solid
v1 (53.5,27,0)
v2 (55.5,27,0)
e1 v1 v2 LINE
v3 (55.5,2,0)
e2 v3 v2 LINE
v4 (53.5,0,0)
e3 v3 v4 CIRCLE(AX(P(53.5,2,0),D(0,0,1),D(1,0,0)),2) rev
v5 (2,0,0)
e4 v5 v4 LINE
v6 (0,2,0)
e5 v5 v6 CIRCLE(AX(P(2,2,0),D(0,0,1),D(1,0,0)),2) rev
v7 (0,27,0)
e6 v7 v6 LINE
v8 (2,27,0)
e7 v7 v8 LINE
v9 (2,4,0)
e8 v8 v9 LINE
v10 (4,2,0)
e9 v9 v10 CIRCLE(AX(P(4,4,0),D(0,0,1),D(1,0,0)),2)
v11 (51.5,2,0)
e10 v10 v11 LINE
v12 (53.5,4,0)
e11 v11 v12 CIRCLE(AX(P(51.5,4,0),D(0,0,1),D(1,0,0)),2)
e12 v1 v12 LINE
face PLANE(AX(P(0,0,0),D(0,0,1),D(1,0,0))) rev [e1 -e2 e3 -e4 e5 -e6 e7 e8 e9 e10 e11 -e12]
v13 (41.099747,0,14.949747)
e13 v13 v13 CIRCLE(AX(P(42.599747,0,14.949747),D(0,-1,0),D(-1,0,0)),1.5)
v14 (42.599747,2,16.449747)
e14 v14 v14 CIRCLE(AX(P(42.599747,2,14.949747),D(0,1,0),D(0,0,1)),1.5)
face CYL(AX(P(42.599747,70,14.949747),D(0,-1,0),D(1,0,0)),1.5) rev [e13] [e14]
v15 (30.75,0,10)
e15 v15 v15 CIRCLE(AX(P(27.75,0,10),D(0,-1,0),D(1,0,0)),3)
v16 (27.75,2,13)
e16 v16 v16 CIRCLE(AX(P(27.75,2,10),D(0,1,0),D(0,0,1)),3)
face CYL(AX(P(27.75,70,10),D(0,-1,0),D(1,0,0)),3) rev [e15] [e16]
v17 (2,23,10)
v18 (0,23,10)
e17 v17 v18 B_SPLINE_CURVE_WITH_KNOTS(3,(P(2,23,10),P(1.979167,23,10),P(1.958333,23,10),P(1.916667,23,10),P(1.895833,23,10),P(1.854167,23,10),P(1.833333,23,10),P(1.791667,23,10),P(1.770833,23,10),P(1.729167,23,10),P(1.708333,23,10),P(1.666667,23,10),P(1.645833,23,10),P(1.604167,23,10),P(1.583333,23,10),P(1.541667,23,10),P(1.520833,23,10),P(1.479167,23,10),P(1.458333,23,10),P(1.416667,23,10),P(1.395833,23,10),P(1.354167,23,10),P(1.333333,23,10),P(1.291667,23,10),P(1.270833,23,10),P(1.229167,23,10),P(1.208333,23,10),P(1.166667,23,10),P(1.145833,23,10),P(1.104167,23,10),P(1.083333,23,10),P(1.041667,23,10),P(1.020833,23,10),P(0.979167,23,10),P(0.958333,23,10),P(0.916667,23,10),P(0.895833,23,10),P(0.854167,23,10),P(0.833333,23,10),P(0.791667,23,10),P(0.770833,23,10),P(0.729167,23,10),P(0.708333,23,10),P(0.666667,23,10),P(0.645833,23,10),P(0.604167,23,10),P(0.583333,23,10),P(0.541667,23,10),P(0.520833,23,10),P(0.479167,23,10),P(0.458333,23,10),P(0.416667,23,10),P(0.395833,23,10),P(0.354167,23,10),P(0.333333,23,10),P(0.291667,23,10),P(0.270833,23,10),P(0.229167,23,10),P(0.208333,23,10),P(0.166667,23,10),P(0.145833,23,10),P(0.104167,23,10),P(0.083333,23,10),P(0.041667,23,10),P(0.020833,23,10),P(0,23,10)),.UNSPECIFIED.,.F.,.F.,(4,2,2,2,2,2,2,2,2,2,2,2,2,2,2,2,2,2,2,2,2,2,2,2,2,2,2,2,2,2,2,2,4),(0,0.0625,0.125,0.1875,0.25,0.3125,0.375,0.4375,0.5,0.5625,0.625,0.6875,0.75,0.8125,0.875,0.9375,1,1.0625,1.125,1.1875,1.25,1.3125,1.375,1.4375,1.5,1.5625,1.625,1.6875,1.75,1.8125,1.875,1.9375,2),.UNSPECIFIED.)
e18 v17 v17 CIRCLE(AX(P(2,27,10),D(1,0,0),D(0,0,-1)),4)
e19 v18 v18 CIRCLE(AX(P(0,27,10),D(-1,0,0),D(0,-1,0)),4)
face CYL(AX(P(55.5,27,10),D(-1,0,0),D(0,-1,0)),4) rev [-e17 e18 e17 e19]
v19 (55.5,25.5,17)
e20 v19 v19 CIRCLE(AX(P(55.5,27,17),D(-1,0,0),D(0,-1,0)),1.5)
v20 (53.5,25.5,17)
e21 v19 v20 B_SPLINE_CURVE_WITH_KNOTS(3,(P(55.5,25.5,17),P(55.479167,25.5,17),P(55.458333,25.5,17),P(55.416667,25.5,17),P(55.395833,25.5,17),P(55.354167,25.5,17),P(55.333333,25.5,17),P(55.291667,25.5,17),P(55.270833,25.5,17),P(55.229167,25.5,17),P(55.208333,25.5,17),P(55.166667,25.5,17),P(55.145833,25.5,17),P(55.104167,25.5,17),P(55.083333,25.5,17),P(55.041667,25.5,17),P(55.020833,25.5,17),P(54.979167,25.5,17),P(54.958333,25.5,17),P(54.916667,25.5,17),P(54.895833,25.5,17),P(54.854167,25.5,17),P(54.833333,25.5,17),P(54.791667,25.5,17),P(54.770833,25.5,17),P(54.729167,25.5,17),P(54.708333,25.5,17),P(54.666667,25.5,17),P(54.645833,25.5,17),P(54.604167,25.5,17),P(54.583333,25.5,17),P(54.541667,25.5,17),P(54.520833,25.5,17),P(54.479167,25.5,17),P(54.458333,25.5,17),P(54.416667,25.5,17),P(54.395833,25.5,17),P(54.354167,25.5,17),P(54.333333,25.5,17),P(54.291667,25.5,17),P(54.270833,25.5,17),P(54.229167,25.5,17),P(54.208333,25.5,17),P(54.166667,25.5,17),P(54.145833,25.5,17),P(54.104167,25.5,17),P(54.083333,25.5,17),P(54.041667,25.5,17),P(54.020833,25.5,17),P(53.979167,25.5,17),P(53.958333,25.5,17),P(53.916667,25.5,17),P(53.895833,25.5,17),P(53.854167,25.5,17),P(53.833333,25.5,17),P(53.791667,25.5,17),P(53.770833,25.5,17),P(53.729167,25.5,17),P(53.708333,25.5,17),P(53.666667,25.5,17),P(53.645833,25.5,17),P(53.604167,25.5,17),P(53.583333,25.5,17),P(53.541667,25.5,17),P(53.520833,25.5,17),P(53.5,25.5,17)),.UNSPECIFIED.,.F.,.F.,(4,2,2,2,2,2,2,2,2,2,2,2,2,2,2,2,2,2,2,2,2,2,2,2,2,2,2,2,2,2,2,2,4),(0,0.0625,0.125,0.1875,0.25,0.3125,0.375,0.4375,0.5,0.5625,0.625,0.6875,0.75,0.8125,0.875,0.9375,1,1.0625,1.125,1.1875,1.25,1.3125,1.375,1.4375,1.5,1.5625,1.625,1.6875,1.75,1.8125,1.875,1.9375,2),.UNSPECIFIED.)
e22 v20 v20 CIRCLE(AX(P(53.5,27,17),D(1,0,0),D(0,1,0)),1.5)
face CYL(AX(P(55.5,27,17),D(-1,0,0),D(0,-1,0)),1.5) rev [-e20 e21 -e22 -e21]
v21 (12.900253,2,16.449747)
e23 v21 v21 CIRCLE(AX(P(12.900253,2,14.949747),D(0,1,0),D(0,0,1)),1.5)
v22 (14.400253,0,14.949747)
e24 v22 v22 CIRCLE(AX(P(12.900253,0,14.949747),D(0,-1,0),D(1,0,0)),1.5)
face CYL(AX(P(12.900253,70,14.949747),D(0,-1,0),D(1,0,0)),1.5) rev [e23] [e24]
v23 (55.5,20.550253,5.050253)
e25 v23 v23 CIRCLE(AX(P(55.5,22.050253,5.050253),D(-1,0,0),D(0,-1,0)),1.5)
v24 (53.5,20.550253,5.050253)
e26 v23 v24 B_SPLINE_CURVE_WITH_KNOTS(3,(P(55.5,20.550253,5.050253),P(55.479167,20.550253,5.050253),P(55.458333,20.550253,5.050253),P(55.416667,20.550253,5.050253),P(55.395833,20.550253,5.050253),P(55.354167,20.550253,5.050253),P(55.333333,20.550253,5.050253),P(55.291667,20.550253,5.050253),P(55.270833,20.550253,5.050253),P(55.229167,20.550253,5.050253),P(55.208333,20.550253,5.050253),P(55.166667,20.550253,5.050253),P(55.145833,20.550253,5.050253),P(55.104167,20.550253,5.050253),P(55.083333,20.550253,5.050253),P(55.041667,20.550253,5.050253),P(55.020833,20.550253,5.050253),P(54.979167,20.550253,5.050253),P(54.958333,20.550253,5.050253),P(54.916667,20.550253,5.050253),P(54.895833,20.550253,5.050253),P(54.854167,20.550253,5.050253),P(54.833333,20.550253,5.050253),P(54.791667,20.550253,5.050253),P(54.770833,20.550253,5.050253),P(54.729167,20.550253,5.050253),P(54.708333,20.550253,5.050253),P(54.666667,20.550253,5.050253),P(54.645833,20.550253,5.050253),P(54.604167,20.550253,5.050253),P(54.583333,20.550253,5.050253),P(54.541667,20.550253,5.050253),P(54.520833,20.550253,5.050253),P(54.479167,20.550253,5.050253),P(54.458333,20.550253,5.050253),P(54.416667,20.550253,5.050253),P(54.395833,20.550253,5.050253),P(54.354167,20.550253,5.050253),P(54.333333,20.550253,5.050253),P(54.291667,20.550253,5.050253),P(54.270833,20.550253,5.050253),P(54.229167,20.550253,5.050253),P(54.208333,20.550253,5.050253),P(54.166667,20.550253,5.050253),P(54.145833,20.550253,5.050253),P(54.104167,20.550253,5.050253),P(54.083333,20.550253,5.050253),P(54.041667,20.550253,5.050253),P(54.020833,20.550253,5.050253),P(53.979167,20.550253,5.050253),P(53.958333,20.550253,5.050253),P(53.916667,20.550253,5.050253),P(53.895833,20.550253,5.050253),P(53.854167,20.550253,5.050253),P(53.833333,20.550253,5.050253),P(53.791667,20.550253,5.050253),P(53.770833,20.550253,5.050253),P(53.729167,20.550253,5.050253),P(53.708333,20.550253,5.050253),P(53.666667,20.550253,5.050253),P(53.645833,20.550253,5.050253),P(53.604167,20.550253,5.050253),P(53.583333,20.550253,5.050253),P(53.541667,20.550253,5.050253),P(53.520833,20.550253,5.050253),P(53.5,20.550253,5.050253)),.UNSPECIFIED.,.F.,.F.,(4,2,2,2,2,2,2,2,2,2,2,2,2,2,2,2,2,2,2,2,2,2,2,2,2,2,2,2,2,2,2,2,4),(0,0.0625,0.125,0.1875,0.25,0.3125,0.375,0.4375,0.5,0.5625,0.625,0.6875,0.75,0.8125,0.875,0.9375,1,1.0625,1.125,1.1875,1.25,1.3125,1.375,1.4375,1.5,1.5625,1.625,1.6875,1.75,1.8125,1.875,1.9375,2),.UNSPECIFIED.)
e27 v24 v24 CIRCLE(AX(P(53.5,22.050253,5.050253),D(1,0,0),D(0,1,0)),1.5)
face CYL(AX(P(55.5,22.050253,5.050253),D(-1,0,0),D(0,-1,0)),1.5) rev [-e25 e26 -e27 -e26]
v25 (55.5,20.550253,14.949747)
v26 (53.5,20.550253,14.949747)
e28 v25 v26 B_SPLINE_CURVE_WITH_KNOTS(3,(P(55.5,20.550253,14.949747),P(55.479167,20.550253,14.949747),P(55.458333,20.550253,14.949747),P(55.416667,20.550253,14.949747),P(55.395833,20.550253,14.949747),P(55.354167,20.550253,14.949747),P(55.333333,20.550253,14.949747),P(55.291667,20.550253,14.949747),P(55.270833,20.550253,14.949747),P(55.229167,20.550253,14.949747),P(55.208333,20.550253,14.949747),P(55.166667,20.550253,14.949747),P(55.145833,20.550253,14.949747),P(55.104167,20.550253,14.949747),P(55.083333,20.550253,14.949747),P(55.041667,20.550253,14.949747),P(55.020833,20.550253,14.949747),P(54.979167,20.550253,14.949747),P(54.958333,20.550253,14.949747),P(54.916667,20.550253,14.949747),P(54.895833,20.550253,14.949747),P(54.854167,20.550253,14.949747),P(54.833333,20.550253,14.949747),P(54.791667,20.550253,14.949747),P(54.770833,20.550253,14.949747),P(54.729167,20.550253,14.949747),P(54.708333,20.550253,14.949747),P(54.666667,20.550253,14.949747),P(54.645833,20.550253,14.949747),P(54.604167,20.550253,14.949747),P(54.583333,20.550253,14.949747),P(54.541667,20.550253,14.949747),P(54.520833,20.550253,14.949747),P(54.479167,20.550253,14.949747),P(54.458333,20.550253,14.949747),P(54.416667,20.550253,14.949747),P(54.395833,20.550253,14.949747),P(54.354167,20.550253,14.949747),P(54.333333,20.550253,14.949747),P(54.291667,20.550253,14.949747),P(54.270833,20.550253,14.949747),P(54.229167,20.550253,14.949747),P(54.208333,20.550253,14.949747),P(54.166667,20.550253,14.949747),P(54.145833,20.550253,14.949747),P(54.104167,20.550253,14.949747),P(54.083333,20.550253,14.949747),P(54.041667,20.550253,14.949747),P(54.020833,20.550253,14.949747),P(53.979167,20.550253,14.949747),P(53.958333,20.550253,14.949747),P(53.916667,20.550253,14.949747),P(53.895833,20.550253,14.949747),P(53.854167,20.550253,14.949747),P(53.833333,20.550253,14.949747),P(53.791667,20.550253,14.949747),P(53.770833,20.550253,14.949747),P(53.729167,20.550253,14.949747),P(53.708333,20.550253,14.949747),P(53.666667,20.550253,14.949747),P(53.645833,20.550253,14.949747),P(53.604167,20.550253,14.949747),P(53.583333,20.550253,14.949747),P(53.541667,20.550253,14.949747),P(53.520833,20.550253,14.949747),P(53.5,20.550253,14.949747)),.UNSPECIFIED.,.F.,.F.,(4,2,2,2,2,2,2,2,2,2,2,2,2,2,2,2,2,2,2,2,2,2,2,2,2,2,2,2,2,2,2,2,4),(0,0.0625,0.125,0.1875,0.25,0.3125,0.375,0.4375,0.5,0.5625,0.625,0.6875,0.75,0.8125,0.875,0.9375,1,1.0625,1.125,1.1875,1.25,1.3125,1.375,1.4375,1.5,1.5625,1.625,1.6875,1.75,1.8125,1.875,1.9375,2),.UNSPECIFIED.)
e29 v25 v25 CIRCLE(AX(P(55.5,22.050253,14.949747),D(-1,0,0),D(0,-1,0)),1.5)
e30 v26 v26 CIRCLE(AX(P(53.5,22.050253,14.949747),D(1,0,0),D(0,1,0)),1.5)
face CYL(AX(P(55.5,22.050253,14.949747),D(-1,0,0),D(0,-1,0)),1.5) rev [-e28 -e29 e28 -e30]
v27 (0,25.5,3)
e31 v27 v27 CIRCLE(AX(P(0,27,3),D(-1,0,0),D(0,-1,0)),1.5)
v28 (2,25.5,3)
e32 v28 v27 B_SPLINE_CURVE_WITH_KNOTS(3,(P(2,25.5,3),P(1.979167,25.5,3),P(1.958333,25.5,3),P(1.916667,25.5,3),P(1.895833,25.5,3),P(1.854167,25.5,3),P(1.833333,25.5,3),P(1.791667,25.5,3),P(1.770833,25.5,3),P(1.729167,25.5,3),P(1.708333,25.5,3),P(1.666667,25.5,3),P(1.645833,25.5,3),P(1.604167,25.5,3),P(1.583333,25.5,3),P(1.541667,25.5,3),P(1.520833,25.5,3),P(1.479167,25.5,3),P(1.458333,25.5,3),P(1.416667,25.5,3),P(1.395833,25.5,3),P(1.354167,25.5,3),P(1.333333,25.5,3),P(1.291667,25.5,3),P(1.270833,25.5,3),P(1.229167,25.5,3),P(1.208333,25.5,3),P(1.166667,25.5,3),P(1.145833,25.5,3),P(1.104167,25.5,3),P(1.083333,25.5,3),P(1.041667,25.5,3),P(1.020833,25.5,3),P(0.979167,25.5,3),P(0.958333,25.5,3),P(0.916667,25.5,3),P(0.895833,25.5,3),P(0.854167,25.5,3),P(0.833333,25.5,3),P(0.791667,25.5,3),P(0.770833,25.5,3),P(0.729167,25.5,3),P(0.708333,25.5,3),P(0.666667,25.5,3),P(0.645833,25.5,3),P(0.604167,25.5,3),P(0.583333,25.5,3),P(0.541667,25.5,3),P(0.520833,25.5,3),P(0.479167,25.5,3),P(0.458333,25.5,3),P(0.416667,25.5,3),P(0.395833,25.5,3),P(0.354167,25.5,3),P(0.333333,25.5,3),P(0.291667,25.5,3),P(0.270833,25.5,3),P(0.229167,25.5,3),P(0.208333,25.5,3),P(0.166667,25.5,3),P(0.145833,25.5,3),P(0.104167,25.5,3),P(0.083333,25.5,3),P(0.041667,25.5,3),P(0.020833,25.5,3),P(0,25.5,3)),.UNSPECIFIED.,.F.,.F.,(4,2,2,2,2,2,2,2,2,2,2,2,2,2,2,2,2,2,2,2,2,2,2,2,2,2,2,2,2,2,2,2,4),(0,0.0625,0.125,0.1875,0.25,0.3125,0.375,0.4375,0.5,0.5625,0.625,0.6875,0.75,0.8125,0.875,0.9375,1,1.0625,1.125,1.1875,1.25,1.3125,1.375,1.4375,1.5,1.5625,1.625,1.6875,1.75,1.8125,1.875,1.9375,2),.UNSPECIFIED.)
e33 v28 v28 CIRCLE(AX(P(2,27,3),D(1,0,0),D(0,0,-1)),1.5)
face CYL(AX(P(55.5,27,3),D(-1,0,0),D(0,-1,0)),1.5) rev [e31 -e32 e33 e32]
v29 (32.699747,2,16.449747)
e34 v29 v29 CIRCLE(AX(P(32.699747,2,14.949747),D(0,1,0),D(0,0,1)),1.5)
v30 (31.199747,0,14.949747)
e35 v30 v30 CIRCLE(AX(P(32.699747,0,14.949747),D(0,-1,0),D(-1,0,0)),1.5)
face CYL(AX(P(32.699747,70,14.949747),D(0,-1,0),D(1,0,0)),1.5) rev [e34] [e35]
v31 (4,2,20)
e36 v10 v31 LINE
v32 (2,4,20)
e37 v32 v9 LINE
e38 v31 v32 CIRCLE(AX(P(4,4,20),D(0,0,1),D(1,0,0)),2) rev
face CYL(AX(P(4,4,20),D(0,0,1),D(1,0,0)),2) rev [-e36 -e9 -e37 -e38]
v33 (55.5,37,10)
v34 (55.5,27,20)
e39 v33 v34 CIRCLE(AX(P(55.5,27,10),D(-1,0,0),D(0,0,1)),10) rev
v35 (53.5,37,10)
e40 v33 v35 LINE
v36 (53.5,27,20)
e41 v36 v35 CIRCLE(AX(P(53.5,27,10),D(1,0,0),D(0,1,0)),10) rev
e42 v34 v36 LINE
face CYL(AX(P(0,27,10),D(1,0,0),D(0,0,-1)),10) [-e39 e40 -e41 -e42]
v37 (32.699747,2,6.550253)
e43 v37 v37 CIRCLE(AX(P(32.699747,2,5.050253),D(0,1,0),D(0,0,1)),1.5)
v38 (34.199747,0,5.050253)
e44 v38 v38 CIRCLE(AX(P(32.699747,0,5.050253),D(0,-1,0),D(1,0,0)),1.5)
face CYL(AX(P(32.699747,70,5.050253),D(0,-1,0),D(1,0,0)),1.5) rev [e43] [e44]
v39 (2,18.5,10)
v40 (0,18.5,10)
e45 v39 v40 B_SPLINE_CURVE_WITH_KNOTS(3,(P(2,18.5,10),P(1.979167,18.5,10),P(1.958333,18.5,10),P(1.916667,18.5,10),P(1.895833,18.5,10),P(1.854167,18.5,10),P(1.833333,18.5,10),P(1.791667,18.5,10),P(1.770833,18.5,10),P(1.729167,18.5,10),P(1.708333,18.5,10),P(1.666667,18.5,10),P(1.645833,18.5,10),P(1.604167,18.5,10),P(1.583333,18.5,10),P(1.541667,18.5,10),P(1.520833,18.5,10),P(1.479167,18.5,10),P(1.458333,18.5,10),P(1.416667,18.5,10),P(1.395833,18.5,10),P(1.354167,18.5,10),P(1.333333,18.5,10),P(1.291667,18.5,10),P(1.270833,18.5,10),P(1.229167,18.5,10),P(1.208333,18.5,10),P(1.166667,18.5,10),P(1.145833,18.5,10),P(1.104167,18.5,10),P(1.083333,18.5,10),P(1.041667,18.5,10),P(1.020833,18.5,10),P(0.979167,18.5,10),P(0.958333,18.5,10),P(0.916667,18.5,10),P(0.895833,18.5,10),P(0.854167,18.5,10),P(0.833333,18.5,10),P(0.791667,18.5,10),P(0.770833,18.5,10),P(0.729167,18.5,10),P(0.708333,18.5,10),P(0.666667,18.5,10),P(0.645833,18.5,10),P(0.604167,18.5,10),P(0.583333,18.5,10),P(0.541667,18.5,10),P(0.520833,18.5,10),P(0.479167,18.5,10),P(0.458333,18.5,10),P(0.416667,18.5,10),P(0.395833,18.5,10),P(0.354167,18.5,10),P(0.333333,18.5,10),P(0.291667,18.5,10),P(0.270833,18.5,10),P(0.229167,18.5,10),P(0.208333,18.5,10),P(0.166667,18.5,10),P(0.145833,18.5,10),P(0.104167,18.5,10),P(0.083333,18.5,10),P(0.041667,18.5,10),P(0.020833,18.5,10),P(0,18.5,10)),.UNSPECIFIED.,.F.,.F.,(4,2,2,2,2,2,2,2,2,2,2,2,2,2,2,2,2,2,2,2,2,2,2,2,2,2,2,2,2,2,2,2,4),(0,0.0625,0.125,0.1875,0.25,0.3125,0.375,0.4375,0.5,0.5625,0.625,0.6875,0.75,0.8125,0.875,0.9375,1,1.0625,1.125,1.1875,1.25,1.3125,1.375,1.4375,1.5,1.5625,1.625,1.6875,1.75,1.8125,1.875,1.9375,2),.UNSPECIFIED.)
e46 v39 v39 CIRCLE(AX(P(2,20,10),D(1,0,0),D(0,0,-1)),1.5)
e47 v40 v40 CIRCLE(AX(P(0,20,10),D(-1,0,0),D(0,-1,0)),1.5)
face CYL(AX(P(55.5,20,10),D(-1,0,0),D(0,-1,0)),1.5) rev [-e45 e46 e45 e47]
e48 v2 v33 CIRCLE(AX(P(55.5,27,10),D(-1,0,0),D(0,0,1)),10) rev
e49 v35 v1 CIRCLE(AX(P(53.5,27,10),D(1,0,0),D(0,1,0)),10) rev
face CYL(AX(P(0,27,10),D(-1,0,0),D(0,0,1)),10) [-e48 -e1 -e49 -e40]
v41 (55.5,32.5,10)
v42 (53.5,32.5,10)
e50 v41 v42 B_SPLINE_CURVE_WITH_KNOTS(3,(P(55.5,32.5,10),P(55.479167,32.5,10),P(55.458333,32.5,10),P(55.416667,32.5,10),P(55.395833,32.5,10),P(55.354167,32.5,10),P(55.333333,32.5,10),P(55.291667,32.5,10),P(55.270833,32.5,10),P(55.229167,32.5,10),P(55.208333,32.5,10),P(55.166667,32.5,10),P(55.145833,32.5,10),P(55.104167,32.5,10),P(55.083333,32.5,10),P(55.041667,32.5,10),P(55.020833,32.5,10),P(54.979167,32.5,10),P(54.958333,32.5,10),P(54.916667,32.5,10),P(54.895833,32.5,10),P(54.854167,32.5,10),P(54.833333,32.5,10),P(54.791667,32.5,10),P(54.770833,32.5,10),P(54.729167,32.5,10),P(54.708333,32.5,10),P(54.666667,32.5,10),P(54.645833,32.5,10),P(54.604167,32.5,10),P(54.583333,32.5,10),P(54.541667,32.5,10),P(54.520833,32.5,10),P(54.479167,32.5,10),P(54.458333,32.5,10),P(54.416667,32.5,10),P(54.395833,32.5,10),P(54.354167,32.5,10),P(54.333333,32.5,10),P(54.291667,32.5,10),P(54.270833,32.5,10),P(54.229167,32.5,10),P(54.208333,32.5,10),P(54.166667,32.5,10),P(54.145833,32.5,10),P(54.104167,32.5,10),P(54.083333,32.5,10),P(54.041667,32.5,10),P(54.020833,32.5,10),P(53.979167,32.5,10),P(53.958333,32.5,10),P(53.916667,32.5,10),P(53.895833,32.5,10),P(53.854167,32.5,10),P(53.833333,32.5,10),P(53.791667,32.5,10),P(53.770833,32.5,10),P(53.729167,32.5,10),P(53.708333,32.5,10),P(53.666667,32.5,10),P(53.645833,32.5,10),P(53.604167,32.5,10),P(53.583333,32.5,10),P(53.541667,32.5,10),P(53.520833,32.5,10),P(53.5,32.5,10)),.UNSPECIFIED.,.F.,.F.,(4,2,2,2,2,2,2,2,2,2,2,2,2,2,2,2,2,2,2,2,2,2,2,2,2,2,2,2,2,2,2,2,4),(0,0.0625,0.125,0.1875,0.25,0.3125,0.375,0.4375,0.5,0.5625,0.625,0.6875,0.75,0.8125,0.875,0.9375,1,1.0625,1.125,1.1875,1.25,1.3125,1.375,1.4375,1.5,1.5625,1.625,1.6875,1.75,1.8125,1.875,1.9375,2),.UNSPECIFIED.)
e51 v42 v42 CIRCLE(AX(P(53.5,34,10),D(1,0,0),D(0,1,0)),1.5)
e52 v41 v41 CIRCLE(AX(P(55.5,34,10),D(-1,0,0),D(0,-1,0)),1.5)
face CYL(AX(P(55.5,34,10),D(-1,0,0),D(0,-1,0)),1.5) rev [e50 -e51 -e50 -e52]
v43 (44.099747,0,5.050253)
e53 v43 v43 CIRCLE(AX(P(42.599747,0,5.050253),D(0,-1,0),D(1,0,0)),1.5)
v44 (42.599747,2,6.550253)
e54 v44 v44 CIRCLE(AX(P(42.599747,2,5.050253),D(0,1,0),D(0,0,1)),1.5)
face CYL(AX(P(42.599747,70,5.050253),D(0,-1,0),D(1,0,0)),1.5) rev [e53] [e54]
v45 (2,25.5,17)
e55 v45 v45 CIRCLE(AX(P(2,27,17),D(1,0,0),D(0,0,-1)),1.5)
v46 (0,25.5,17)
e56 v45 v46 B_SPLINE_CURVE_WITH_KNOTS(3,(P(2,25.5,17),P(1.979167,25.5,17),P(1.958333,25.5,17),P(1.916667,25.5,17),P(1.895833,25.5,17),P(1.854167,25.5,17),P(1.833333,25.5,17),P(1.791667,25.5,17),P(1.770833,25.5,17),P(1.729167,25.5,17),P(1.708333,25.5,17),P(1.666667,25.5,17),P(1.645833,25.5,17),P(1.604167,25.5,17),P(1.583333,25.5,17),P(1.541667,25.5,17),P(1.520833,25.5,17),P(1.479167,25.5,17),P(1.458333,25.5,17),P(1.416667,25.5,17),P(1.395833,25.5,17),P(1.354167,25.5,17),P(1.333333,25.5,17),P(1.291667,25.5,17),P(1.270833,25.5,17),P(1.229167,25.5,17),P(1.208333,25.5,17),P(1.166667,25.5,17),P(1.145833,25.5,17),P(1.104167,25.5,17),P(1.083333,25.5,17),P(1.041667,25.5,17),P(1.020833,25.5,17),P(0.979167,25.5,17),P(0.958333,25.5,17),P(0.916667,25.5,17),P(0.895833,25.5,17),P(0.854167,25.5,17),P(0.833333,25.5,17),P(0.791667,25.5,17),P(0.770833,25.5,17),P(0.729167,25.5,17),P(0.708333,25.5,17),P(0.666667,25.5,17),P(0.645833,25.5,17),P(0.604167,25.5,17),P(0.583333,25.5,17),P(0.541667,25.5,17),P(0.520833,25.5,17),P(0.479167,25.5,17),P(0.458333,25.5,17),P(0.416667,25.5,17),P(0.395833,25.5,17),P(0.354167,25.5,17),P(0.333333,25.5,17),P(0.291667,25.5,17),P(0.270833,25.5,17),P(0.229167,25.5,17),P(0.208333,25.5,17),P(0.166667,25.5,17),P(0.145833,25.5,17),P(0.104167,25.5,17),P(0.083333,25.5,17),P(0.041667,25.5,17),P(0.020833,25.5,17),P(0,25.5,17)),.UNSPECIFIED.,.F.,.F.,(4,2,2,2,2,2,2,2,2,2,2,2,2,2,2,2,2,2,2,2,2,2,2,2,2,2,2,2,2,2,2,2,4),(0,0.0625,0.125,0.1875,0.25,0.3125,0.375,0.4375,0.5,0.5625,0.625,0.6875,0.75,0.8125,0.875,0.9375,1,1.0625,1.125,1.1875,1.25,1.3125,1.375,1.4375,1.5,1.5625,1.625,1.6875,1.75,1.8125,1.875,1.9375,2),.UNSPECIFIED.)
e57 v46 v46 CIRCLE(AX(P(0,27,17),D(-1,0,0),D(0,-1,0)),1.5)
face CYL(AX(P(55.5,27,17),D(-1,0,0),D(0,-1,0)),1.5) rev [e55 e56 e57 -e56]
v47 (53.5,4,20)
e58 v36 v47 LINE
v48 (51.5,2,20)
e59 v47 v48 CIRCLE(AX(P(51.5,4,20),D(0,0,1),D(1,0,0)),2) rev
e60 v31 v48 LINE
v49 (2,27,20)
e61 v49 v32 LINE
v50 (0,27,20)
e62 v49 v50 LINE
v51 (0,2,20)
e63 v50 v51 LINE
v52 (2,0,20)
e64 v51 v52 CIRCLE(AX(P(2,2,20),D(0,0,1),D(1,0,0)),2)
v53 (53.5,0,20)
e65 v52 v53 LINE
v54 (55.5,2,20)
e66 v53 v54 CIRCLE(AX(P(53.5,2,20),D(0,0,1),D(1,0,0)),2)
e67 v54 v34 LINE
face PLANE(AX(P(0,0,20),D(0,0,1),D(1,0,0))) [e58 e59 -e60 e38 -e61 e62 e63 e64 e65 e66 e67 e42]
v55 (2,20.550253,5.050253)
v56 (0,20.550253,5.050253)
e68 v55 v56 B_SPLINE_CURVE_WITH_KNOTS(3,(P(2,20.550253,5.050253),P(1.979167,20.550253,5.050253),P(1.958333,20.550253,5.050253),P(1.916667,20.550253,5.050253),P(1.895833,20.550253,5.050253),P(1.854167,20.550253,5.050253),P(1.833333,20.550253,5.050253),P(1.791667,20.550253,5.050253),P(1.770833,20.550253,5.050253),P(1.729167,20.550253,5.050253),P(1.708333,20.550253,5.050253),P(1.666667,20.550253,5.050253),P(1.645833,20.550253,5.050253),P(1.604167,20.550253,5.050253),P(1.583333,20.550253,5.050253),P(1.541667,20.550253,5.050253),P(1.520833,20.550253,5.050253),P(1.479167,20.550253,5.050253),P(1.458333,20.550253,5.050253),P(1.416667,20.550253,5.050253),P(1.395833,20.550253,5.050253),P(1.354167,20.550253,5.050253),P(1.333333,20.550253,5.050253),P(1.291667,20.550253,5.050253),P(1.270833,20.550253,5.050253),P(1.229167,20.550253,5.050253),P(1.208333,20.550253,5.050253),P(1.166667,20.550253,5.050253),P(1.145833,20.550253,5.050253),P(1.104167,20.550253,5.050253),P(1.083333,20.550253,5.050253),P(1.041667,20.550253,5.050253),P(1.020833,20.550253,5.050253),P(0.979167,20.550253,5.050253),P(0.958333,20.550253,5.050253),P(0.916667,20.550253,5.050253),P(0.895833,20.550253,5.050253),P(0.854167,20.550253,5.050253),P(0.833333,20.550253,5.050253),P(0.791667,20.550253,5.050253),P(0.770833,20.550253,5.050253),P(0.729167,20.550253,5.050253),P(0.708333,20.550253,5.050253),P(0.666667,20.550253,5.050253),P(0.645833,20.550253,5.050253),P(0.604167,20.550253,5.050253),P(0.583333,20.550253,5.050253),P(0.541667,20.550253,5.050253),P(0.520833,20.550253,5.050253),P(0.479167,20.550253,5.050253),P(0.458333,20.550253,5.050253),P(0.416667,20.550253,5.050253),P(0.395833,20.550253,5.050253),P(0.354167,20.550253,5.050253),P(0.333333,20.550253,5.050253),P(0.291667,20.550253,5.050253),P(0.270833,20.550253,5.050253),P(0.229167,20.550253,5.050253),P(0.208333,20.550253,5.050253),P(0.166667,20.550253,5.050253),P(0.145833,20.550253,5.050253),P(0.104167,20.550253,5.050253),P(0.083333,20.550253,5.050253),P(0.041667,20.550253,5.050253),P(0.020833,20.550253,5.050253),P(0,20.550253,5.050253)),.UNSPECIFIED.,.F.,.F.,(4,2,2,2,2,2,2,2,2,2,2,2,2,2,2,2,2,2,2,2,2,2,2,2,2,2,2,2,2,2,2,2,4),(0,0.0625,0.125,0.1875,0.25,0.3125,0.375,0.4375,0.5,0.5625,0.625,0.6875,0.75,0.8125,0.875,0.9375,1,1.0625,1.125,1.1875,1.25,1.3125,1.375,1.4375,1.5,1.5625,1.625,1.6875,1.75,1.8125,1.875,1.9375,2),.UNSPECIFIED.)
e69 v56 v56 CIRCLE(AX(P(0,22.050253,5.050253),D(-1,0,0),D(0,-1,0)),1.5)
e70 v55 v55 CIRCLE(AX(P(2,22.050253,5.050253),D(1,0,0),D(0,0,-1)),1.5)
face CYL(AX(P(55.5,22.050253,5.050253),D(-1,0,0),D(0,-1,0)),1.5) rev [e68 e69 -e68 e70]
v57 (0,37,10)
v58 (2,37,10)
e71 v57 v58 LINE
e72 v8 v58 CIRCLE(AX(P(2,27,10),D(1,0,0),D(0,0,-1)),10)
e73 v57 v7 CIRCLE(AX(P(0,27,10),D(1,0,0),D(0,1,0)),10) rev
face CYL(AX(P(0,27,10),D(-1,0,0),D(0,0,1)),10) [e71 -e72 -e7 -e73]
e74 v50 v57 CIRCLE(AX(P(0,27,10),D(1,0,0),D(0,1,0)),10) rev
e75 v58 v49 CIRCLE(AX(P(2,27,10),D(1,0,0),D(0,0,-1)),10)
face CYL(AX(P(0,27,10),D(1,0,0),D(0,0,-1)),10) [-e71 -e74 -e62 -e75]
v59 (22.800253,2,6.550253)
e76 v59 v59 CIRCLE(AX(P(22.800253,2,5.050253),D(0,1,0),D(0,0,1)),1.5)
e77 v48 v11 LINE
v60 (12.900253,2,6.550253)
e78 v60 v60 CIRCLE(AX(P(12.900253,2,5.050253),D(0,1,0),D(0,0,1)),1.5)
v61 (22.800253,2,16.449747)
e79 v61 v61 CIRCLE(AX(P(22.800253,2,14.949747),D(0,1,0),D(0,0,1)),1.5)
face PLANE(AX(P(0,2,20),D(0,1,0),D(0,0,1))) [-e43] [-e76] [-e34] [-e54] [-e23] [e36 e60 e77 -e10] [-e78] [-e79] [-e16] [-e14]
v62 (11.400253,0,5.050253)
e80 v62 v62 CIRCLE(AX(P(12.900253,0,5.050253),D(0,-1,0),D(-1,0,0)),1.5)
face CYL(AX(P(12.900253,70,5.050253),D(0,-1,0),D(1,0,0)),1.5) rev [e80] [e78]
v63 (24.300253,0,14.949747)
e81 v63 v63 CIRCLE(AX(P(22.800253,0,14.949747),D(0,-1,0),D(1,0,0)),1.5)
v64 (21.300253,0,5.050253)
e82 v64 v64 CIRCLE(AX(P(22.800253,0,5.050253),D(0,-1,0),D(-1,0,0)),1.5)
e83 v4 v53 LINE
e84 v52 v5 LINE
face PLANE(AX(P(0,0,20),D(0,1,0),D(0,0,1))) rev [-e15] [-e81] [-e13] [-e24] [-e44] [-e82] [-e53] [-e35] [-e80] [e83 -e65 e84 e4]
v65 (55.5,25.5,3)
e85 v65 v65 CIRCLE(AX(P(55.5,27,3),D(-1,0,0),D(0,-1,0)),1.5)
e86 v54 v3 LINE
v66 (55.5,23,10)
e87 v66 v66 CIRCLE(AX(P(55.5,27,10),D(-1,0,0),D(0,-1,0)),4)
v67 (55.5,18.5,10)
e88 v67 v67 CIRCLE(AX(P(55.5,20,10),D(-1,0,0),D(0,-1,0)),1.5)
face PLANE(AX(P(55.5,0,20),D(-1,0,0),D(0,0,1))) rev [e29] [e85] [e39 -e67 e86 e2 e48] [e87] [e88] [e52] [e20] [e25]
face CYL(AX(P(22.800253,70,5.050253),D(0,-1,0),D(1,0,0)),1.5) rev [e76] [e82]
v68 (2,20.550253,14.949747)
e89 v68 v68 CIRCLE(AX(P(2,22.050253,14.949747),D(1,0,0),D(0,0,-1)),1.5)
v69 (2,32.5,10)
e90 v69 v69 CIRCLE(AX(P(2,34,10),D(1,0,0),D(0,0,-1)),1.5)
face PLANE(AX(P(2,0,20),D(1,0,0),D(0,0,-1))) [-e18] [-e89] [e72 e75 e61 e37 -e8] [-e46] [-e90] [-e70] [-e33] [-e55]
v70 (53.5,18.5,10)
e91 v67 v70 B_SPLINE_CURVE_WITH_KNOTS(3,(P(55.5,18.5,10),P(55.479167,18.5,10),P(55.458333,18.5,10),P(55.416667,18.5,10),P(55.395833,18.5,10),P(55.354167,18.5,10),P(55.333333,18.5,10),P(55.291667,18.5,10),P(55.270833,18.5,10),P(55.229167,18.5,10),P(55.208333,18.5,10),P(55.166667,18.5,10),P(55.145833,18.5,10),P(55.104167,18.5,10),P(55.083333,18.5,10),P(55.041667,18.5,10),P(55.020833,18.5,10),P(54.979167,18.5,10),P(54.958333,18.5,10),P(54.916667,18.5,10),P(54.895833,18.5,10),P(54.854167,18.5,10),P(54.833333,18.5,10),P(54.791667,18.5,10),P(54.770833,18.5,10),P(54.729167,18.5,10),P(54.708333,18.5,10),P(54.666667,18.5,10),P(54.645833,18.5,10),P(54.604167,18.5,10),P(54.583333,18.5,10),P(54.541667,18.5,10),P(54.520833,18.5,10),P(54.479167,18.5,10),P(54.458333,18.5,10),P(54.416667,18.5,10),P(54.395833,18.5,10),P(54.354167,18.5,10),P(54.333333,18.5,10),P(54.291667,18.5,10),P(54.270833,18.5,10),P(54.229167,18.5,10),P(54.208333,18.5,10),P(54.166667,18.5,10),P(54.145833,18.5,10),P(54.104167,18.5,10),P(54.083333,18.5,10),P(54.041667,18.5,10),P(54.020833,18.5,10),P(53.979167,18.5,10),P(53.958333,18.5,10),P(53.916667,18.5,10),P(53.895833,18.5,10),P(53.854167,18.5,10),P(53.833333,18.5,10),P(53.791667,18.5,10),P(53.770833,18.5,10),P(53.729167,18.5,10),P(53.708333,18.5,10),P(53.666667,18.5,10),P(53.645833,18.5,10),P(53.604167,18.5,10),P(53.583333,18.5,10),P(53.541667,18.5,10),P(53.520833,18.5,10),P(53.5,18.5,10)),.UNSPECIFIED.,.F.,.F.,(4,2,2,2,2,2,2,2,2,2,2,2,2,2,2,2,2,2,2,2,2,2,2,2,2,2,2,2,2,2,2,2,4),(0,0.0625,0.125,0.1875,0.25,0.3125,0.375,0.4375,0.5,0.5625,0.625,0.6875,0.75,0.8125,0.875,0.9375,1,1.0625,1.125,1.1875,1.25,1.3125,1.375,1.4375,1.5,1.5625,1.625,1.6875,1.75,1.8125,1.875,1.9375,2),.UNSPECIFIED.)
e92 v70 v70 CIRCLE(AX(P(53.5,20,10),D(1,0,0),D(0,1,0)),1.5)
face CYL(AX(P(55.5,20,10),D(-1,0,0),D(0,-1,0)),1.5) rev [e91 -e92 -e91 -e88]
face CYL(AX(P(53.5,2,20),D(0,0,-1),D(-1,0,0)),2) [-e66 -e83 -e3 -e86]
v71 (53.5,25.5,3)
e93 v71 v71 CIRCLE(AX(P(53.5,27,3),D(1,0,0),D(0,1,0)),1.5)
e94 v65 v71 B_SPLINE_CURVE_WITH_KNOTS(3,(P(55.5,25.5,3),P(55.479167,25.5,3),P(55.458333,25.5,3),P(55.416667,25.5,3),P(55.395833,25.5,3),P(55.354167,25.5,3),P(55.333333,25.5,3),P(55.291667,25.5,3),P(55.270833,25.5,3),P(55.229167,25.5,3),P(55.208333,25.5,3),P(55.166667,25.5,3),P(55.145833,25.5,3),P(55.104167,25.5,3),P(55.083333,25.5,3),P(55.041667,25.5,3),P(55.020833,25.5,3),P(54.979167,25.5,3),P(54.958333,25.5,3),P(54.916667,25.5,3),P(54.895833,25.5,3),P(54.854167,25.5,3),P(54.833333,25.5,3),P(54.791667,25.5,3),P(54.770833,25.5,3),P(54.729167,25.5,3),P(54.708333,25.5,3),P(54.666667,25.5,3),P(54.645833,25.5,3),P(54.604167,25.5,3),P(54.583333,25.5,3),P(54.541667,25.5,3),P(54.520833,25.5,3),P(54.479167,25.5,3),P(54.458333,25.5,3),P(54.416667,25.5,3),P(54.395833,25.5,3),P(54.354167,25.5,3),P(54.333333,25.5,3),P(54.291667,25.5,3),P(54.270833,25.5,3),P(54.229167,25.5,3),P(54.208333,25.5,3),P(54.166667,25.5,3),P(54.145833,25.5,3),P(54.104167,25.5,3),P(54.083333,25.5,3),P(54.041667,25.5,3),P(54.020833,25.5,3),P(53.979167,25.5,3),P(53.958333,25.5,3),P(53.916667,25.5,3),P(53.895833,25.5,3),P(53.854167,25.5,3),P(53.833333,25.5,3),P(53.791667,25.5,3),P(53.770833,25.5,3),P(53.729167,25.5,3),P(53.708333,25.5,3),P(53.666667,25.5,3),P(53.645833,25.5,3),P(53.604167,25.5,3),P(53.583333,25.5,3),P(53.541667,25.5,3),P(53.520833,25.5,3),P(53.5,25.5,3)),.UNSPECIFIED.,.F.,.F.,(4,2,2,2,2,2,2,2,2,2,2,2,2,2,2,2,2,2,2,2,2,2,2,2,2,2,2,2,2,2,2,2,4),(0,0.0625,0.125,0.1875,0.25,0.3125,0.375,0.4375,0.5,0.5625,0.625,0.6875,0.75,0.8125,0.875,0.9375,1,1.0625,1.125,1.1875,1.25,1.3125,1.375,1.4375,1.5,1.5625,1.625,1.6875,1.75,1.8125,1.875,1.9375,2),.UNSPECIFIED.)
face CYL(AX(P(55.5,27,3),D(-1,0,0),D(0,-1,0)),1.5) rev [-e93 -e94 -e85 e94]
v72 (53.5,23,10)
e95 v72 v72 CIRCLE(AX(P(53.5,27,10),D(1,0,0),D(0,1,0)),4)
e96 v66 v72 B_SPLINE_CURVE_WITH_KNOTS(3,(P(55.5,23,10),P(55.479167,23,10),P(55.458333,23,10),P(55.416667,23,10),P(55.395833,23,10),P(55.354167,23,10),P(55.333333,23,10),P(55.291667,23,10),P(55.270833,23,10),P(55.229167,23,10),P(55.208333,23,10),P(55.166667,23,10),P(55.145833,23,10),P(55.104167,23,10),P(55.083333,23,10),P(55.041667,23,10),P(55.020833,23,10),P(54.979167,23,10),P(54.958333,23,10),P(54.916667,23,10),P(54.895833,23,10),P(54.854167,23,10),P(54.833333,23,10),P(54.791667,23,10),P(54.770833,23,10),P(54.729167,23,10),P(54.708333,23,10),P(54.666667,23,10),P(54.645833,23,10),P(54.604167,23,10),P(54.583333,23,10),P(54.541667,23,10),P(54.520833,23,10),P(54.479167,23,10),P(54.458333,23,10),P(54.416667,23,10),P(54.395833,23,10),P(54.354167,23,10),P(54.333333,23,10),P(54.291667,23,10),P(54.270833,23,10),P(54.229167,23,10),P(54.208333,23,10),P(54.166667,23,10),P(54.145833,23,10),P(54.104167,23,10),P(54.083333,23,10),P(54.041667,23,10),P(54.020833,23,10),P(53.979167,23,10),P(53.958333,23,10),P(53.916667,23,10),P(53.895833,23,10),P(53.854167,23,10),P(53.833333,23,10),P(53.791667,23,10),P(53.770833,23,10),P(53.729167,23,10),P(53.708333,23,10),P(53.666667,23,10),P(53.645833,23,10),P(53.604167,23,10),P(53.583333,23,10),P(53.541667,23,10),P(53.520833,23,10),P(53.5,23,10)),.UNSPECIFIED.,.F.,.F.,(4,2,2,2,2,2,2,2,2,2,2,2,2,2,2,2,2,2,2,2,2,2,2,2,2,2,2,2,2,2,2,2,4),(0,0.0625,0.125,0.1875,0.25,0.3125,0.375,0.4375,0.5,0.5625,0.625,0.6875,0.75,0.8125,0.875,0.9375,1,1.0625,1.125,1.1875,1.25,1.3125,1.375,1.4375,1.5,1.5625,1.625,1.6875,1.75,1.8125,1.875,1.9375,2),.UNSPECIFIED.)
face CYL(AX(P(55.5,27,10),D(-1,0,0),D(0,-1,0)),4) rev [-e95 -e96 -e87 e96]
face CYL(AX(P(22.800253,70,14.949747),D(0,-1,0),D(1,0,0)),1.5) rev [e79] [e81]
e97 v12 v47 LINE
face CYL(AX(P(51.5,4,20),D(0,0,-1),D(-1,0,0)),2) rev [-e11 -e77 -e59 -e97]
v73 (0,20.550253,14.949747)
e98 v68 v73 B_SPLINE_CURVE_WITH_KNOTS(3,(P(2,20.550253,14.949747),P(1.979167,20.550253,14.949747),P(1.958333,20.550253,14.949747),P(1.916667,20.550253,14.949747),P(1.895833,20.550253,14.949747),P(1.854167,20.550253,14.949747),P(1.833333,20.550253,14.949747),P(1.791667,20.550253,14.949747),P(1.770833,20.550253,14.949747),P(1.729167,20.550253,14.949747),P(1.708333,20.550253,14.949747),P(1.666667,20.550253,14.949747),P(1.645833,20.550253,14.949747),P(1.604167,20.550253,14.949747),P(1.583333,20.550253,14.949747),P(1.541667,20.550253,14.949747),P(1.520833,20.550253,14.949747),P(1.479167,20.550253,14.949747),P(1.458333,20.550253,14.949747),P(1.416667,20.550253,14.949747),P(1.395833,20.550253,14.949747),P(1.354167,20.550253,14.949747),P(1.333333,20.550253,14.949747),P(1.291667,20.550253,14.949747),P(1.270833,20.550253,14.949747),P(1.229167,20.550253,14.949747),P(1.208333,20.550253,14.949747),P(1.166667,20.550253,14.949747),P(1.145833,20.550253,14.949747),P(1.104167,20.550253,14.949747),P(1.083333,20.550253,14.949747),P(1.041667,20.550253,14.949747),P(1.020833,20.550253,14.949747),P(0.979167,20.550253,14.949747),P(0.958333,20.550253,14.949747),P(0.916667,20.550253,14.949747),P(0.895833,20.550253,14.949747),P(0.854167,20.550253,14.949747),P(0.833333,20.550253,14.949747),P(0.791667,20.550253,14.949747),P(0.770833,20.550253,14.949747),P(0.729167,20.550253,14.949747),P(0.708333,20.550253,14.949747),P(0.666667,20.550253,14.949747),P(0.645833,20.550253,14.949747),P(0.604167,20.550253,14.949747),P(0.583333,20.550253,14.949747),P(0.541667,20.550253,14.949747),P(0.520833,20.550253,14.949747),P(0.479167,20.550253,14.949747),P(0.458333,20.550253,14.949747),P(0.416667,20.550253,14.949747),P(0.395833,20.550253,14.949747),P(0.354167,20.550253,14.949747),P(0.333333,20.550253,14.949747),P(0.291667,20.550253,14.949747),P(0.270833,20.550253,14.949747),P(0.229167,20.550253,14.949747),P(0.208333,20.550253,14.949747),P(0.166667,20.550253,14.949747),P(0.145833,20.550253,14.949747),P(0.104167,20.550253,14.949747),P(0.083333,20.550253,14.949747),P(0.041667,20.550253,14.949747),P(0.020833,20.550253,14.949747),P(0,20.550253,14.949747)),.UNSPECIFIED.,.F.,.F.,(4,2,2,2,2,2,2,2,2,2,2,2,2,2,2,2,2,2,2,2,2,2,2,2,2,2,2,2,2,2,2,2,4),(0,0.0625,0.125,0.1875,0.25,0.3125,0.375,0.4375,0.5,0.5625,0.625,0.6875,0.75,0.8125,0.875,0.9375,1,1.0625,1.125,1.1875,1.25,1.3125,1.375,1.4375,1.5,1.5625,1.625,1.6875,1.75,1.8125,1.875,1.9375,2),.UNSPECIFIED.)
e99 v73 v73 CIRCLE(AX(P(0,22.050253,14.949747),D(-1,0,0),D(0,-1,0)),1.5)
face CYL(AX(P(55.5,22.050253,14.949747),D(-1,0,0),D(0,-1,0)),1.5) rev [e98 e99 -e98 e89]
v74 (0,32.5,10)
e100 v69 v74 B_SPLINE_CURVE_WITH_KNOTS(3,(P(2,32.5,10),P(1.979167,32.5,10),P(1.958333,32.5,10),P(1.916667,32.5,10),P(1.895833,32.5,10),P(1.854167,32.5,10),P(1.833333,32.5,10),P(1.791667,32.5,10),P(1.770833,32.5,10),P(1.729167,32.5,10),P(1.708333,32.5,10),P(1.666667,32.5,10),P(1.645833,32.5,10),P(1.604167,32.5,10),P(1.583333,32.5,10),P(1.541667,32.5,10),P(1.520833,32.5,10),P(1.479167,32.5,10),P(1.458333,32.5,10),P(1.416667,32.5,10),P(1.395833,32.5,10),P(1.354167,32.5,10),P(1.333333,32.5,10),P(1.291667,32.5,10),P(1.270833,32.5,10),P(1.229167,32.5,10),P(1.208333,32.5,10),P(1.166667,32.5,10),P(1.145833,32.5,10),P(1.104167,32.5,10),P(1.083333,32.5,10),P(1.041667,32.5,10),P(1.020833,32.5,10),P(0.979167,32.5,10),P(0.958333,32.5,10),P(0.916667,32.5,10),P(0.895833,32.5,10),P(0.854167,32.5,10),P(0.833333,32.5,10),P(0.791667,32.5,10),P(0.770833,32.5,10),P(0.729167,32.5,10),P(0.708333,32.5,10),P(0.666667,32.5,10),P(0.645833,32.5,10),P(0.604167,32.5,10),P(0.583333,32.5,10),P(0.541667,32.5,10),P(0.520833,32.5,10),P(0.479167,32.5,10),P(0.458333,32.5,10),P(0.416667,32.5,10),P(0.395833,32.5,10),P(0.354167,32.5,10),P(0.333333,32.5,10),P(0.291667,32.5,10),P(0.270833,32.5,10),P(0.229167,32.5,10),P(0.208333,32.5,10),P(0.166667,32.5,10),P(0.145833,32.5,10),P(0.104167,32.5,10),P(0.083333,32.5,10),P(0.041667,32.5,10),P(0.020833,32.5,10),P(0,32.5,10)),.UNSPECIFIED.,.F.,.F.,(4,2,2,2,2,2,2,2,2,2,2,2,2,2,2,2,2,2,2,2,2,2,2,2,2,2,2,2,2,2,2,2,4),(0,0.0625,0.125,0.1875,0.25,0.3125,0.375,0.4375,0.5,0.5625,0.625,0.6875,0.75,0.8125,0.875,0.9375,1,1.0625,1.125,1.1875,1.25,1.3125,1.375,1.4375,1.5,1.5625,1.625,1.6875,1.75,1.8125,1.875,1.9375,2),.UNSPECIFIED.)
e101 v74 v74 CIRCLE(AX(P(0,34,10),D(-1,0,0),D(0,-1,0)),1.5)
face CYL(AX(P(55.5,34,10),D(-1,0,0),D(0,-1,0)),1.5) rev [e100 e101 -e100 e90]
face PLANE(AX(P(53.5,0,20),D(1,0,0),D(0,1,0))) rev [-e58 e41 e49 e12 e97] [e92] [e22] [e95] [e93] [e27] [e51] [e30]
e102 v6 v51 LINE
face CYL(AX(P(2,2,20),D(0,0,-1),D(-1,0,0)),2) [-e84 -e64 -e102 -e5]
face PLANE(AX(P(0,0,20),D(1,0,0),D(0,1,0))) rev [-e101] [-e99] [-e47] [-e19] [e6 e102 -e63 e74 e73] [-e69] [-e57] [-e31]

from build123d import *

# Parameters (mm, degrees)
EXTRUDE_933_DEPTH      = 20
SKETCH6_R              = 3
SKETCH6_R_2            = 1.5
CUT_EXTRUDE_1730_DEPTH = 70
SKETCH7_R              = 1.5
SKETCH7_R_2            = 4
CUT_EXTRUDE_2086_DEPTH = 55.5
FILLET1_R              = 10
FILLET2_R              = 2


with BuildPart() as part:
    # Sketch2 → Extrude 933 (new body)
    with BuildSketch(Plane.XY):
        Polygon((0, 0), (55.5, 0), (55.5, 37), (53.5, 37), (53.5, 2), (2, 2), (2, 37), (0, 37), align=None)
    extrude(amount=EXTRUDE_933_DEPTH)

    # Sketch6 → Cut-Extrude 1730 (cut)
    with BuildSketch(Plane(origin=(0, 0, 0), x_dir=(-1, 0, 0), z_dir=(0, -1, 0))):
        with Locations(Location((-27.75, -10, 0), (0, 0, 180))):
            Circle(SKETCH6_R)
        with Locations(Location((-32.699747468, -14.949747468, 0), (0, 0, 270))):
            Circle(SKETCH6_R_2)
        with Locations(Location((-32.699747468, -5.050252532, 0), (0, 0, 180))):
            Circle(SKETCH6_R_2)
        with Locations(Location((-42.599747468, -14.949747468, 0), (0, 0, 270))):
            Circle(SKETCH6_R_2)
        with Locations(Location((-42.599747468, -5.050252532, 0), (0, 0, 180))):
            Circle(SKETCH6_R_2)
        with Locations(Location((-12.900252532, -5.050252532, 0), (0, 0, 270))):
            Circle(SKETCH6_R_2)
        with Locations(Location((-22.800252532, -5.050252532, 0), (0, 0, 270))):
            Circle(SKETCH6_R_2)
        with Locations(Location((-22.800252532, -14.949747468, 0), (0, 0, 180))):
            Circle(SKETCH6_R_2)
        with Locations(Location((-12.900252532, -14.949747468, 0), (0, 0, 180))):
            Circle(SKETCH6_R_2)
    extrude(amount=-CUT_EXTRUDE_1730_DEPTH, mode=Mode.SUBTRACT)

    # Sketch7 → Cut-Extrude 2086 (cut)
    with BuildSketch(Plane.ZY):
        with Locations(Location((17, 27, 0), (0, 0, 270))):
            Circle(SKETCH7_R)
        with Locations(Location((14.949747468, 22.050252532, 0), (0, 0, 270))):
            Circle(SKETCH7_R)
        with Locations(Location((10, 20, 0), (0, 0, 270))):
            Circle(SKETCH7_R)
        with Locations(Location((5.050252532, 22.050252532, 0), (0, 0, 270))):
            Circle(SKETCH7_R)
        with Locations(Location((10, 34, 0), (0, 0, 270))):
            Circle(SKETCH7_R)
        with Locations(Location((3, 27, 0), (0, 0, 270))):
            Circle(SKETCH7_R)
        with Locations(Location((10, 27, 0), (0, 0, 270))):
            Circle(SKETCH7_R_2)
    extrude(amount=-CUT_EXTRUDE_2086_DEPTH, mode=Mode.SUBTRACT)

    # Fillet1
    fillet1_edges = [part.edges().sort_by_distance(p)[0] for p in [
        (54.5, 37, 20),
        (54.5, 37, 0),
        (1, 37, 0),
        (1, 37, 20),
    ]]
    fillet(fillet1_edges, radius=FILLET1_R - 0.0001)  # a hair under: the kernel refuses the full size

    # Fillet2
    fillet2_edges = [part.edges().sort_by_distance(p)[0] for p in [
        (2, 2, 10),
        (53.5, 2, 10),
        (55.5, 0, 10),
        (0, 0, 10),
    ]]
    fillet(fillet2_edges, radius=FILLET2_R)


solid = part.part
